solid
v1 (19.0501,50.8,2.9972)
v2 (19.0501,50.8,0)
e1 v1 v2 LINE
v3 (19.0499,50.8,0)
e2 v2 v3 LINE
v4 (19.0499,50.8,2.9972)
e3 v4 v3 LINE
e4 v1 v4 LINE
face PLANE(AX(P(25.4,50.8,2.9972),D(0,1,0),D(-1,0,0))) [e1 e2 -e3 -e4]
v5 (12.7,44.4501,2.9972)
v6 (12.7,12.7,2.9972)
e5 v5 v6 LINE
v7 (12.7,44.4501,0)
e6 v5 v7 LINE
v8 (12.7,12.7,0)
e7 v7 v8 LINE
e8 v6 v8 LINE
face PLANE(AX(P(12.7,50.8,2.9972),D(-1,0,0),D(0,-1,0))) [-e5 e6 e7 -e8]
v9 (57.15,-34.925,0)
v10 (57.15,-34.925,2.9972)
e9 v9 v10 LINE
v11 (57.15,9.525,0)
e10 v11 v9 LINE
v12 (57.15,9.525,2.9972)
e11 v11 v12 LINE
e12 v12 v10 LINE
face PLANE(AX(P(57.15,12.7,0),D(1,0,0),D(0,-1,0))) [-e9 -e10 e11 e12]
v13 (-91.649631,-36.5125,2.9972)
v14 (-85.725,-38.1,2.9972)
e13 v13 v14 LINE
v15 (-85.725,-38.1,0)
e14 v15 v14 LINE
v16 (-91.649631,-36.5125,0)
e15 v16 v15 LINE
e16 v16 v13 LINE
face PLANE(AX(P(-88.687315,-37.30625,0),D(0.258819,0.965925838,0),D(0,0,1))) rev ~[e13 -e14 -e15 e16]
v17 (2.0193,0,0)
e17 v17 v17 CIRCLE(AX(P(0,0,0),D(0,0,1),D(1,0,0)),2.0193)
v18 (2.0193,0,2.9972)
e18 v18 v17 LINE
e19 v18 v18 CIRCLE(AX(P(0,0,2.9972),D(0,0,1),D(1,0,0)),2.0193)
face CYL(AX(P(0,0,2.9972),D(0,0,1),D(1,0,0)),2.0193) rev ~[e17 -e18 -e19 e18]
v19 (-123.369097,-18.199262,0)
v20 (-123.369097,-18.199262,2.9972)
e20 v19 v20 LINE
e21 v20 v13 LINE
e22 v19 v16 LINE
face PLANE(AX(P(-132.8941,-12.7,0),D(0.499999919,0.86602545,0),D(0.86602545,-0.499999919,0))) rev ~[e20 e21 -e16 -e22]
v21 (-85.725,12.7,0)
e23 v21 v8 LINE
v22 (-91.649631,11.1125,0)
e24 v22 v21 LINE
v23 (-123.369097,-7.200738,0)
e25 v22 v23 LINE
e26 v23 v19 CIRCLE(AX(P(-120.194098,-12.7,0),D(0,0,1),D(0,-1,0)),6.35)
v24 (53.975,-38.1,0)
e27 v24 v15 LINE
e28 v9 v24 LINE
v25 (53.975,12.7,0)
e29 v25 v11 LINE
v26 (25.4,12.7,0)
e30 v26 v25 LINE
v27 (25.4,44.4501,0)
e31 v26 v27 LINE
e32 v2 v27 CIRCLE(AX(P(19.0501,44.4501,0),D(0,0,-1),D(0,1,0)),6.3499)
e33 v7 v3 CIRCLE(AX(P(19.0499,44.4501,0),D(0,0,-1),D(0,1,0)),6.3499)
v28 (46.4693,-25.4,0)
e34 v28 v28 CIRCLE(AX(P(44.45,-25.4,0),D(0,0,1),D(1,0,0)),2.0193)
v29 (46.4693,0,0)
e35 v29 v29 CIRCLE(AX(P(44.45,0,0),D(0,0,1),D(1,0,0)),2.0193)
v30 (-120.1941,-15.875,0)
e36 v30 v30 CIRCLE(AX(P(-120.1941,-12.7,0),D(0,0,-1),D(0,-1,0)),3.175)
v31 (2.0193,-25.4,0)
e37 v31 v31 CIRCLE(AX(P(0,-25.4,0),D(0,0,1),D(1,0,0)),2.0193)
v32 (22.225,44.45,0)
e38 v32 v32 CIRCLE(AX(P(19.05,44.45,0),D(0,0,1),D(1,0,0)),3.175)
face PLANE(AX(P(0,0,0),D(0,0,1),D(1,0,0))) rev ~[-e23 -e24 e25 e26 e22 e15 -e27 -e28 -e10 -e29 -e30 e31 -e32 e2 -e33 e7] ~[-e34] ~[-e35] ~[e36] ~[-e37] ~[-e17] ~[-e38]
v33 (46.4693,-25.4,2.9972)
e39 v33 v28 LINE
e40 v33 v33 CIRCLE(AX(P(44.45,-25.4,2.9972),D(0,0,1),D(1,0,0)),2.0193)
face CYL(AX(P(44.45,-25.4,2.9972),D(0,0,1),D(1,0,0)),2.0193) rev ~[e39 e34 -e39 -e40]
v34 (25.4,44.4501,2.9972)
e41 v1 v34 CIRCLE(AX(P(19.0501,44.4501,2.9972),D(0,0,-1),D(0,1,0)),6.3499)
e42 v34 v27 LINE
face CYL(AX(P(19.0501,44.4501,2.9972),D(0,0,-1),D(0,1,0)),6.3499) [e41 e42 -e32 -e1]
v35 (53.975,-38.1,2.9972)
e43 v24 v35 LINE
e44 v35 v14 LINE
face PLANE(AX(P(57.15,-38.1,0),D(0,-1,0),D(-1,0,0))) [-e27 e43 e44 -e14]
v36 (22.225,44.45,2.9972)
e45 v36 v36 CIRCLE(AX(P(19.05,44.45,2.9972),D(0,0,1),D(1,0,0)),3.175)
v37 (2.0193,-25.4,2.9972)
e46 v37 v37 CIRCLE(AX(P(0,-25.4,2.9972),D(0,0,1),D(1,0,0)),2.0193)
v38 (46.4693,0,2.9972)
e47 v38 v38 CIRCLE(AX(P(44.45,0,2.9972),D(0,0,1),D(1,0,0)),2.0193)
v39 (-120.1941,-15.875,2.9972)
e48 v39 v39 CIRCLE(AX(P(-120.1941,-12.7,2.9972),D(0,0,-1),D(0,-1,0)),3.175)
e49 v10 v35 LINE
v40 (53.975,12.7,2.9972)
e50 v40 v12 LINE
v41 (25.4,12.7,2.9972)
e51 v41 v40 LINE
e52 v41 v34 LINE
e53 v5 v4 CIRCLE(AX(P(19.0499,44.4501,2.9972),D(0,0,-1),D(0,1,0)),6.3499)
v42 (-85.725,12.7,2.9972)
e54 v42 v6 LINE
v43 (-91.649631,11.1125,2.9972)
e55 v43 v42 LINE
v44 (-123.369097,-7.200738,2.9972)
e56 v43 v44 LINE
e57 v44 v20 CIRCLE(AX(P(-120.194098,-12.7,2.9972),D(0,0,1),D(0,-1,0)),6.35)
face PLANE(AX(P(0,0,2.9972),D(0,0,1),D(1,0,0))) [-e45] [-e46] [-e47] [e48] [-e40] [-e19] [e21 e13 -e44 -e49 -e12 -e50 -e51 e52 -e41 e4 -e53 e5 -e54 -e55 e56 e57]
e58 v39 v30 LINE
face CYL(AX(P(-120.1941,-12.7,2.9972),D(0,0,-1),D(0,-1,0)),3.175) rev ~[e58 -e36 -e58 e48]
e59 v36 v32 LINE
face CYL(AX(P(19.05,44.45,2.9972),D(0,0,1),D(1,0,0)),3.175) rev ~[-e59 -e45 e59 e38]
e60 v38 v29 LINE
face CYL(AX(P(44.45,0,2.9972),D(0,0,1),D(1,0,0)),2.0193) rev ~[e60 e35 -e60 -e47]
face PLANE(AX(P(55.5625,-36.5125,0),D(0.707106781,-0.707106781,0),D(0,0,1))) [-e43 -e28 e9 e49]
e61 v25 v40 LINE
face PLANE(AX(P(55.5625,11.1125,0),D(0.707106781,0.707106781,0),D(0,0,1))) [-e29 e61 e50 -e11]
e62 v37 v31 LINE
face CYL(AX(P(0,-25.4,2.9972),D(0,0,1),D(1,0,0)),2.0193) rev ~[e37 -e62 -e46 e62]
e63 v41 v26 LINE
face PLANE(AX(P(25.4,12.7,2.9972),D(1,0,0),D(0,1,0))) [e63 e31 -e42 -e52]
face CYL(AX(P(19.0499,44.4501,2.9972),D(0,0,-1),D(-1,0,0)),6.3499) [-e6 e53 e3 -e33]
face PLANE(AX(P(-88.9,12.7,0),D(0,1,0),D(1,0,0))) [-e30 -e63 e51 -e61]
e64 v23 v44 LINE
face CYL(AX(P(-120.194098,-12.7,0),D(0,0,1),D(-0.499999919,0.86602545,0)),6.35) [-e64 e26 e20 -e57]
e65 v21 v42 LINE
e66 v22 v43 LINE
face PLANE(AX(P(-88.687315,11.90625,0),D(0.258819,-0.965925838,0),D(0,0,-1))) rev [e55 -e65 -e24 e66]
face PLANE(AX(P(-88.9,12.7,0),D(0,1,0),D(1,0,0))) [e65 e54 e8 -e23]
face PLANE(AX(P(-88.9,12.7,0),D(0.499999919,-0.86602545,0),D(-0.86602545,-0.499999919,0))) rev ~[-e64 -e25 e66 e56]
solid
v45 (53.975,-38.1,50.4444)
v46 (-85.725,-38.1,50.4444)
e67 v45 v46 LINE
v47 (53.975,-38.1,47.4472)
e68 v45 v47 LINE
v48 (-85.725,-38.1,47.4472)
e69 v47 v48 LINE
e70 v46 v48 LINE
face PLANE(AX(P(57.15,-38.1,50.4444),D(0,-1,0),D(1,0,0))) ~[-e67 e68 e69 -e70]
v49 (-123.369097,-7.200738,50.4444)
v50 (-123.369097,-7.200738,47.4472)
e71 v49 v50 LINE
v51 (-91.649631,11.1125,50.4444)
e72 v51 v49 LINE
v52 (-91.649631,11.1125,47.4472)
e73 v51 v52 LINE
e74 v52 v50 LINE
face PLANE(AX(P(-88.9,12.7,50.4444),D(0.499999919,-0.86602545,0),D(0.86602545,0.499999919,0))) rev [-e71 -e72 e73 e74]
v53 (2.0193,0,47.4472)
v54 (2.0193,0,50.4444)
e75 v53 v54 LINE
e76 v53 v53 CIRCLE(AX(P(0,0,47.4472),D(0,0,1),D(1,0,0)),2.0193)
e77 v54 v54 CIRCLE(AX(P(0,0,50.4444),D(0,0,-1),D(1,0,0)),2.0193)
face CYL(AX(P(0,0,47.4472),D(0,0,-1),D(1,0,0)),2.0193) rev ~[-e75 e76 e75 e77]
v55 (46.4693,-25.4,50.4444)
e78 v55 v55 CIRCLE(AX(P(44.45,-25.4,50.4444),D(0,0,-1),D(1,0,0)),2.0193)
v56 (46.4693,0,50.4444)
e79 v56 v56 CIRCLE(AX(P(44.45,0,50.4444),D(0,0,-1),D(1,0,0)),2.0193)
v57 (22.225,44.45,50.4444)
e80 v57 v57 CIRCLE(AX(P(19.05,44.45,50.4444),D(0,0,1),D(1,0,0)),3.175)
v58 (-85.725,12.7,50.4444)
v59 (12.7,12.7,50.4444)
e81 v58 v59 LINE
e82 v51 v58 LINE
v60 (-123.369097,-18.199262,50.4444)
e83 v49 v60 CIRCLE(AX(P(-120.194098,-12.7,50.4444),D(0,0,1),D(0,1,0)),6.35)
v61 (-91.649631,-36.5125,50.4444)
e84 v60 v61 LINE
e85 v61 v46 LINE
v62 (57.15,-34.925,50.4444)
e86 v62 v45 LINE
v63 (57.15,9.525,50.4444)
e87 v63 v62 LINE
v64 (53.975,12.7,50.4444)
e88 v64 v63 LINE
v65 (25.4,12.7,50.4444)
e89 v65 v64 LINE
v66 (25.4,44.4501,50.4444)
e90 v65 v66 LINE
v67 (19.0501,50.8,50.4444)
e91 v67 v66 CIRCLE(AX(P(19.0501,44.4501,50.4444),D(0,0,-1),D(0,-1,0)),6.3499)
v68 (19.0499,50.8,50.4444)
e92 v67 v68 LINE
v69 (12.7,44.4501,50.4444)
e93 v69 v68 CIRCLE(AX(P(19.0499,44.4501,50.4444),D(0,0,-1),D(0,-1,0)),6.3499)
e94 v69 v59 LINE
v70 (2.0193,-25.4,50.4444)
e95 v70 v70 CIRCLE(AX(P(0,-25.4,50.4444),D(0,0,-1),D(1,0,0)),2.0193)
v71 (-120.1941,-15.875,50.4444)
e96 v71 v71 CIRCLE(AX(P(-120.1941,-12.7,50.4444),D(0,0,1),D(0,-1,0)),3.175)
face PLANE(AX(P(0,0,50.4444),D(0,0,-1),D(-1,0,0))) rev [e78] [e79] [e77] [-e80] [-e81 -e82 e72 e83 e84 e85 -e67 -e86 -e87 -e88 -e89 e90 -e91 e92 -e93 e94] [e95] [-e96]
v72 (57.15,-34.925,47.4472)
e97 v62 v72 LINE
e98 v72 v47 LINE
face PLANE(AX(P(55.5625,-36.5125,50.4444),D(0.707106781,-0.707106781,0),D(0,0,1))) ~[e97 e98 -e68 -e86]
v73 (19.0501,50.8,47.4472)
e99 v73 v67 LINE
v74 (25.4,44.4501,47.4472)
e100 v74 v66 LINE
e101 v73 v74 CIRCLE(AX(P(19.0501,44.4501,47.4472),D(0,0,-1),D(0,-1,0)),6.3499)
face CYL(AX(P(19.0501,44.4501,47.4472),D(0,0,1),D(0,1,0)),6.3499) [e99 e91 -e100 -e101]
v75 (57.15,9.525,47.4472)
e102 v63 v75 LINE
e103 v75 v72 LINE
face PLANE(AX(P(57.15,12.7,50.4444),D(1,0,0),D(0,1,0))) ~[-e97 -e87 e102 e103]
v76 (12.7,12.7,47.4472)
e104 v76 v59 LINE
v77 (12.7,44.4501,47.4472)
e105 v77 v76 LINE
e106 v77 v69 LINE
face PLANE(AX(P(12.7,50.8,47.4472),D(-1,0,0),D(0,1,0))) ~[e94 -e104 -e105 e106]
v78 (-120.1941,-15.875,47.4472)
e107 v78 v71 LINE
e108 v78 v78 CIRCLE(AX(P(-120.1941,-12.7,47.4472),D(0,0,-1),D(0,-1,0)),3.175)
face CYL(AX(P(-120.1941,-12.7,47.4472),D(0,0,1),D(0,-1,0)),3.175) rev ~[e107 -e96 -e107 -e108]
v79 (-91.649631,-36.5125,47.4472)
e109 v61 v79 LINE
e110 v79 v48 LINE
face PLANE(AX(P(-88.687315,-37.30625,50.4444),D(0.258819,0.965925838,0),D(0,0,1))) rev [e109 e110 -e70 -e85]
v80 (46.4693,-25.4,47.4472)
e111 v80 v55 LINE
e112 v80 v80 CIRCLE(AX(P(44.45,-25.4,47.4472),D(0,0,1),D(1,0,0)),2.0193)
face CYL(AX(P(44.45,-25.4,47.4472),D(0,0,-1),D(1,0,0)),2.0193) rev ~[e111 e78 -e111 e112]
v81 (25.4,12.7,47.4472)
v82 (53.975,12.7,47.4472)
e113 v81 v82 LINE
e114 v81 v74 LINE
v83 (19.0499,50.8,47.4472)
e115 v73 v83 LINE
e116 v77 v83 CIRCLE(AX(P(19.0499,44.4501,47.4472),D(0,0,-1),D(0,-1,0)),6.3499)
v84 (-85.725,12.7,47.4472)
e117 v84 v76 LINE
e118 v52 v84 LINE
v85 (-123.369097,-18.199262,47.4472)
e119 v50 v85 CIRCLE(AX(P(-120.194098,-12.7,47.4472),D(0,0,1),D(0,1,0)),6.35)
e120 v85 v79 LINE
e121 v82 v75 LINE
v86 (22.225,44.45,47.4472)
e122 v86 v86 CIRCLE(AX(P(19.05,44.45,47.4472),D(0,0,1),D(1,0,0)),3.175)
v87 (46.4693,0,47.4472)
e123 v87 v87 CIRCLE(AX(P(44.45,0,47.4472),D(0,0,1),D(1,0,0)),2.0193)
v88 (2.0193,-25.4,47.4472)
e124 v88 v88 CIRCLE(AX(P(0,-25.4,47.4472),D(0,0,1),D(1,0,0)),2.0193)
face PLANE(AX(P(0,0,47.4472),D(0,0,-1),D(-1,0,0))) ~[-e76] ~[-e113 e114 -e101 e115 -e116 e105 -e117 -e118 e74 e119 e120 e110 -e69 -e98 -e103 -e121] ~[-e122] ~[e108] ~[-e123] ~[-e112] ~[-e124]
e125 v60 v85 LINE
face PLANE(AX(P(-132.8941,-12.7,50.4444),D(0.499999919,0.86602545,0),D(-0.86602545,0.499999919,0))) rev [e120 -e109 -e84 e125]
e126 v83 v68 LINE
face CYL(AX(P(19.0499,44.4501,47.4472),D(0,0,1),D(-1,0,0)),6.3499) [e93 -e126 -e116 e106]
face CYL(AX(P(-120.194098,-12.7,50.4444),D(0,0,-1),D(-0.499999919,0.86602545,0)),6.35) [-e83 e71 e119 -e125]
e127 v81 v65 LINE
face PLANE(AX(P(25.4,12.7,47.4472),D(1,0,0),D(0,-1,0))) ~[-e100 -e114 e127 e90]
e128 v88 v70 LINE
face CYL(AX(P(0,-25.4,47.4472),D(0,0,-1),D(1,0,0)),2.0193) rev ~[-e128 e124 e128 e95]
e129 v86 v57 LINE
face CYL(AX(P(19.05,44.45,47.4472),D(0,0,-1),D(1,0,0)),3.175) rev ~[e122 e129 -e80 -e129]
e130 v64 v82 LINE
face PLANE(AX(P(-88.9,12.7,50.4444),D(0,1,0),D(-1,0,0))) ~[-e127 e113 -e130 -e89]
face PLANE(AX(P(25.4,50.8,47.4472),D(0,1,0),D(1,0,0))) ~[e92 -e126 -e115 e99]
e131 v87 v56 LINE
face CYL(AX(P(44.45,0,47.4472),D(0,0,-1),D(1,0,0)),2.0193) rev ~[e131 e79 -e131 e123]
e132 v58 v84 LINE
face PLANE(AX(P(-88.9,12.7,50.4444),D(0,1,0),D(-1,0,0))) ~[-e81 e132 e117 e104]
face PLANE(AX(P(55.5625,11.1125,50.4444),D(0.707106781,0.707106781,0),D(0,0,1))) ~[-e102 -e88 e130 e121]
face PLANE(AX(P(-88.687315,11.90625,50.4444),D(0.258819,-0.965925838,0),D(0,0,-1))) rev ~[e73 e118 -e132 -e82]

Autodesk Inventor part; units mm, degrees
ref_plane "YZ Plane" through (0, 0, 0) normal (1, 0, 0) x (0, 1, 0)
ref_plane "XZ Plane" through (0, 0, 0) normal (0, 1, 0) x (-1, 0, 0)
sketch "Sketch1" plane through (0, 0, 0) normal (0, 0, 1) x (1, 0, 0)
  line L0 (0, 0) -> (44.45, 0) construction
  line L1 (44.45, 0) -> (44.45, -25.4) construction
  line L2 (44.45, -25.4) -> (0, -25.4) construction
  line L3 (0, -25.4) -> (0, 0) construction
  line L4 (-88.9, 12.7) -> (57.15, 12.7)
  line L5 (57.15, 12.7) -> (57.15, -38.1)
  line L6 (57.15, -38.1) -> (-88.9, -38.1)
  line L7 (-88.9, 12.7) -> (-132.8941, -12.7)
  line L8 (-132.8941, -12.7) -> (-88.9, -38.1)
  line L9 (-88.9, 12.7) -> (-88.9, -38.1) construction
  dimension "d0" = 44.45
  dimension "d1" = 25.4
  dimension "d2" = 12.7
  dimension "d3" = 12.7
  dimension "d5" = 12.7
  dimension "d37" = 146.05
  dimension "d38" = 50.8
extrude "Extrusion1" add sketch "Sketch1" along normal blind 2.9972
sketch "Sketch2" plane through (0, 0, 2.9972) normal (0, 0, 1) x (1, 0, 0)
  line L0 (0, -25.4) -> (44.45, -25.4) construction
  line L1 (44.45, -25.4) -> (44.45, 0) construction
  line L2 (44.45, 0) -> (0, 0) construction
  line L3 (0, 0) -> (0, -25.4) construction
  line L4 (-88.9, -38.1) -> (57.15, -38.1) projected
  line L5 (57.15, -38.1) -> (57.15, 12.7) projected
  circle A0 centre (0, 0) radius 2.0193
  circle A1 centre (44.45, 0) radius 2.0193
  circle A2 centre (44.45, -25.4) radius 2.0193
  circle A3 centre (0, -25.4) radius 2.0193
  point P0 (0, 0)
  dimension "d8" = 12.7
  dimension "d9" = 25.4
  dimension "d10" = 12.7
  dimension "d11" = 44.45
  dimension "d12" = 4.0386
extrude "Extrusion2" cut sketch "Sketch2" against normal through all
fillet "Fillet1" radius 6.35 1 edges at (-132.8941, -12.7, 1.4986)
chamfer "Chamfer1" distance 3.175 angle 45 4 edges at (57.15, 12.7, 1.4986) (57.15, -38.1, 1.4986) (-88.9, 12.7, 1.4986) (-88.9, -38.1, 1.4986)
sketch "Sketch3" plane through (0, 0, 2.9972) normal (0, 0, 1) x (1, 0, 0)
  arc A0 (-123.3691, -7.2007) -> (-123.3691, -18.1993) centre (-120.1941, -12.7) ccw projected
  circle A1 centre (-120.1941, -12.7) radius 3.175
  point P0 (0, 0)
  dimension "d19" = 6.35
hole "Hole1" at (-120.1941, -12.7, 2.9972) direction (0, 0, -1) diameter 6.35 end through all
sketch "Sketch4" plane through (0, 0, 2.9972) normal (0, 0, 1) x (1, 0, 0)
  circle A0 centre (19.05, 44.45) radius 3.175
  line L0 (53.975, 12.7) -> (-85.725, 12.7) projected
  line L1 (12.7, 12.7) -> (25.4, 12.7)
  line L2 (25.4, 12.7) -> (25.4, 50.8)
  line L3 (25.4, 50.8) -> (12.7, 50.8)
  line L4 (12.7, 50.8) -> (12.7, 12.7)
  line L5 (57.15, -34.925) -> (57.15, 9.525) projected
  point P0 (0, 0)
  dimension "d27" = 6.35
  dimension "d28" = 6.35
  dimension "d29" = 12.7
  dimension "d30" = 6.35
  dimension "d31" = 31.75
  dimension "d32" = 38.1
extrude "Extrusion3" add sketch "Sketch4" against normal blind 2.9972
fillet "Fillet2" radius 6.35 2 edges at (12.7, 50.8, 1.4986) (25.4, 50.8, 1.4986)
ref_plane "Work Plane1" through (0, 0, 25.2222) normal (0, 0, 1) x (1, 0, 0)
mirror "Mirror1" about plane through (0, 0, 25.2222) normal (0, 0, 1) of "Extrusion1", "Extrusion2", "Fillet1", "Chamfer1", "Hole1", "Extrusion3", "Fillet2"
properties part number "Papa John Mounting Plate" material "Polycarbonate, Clear"
